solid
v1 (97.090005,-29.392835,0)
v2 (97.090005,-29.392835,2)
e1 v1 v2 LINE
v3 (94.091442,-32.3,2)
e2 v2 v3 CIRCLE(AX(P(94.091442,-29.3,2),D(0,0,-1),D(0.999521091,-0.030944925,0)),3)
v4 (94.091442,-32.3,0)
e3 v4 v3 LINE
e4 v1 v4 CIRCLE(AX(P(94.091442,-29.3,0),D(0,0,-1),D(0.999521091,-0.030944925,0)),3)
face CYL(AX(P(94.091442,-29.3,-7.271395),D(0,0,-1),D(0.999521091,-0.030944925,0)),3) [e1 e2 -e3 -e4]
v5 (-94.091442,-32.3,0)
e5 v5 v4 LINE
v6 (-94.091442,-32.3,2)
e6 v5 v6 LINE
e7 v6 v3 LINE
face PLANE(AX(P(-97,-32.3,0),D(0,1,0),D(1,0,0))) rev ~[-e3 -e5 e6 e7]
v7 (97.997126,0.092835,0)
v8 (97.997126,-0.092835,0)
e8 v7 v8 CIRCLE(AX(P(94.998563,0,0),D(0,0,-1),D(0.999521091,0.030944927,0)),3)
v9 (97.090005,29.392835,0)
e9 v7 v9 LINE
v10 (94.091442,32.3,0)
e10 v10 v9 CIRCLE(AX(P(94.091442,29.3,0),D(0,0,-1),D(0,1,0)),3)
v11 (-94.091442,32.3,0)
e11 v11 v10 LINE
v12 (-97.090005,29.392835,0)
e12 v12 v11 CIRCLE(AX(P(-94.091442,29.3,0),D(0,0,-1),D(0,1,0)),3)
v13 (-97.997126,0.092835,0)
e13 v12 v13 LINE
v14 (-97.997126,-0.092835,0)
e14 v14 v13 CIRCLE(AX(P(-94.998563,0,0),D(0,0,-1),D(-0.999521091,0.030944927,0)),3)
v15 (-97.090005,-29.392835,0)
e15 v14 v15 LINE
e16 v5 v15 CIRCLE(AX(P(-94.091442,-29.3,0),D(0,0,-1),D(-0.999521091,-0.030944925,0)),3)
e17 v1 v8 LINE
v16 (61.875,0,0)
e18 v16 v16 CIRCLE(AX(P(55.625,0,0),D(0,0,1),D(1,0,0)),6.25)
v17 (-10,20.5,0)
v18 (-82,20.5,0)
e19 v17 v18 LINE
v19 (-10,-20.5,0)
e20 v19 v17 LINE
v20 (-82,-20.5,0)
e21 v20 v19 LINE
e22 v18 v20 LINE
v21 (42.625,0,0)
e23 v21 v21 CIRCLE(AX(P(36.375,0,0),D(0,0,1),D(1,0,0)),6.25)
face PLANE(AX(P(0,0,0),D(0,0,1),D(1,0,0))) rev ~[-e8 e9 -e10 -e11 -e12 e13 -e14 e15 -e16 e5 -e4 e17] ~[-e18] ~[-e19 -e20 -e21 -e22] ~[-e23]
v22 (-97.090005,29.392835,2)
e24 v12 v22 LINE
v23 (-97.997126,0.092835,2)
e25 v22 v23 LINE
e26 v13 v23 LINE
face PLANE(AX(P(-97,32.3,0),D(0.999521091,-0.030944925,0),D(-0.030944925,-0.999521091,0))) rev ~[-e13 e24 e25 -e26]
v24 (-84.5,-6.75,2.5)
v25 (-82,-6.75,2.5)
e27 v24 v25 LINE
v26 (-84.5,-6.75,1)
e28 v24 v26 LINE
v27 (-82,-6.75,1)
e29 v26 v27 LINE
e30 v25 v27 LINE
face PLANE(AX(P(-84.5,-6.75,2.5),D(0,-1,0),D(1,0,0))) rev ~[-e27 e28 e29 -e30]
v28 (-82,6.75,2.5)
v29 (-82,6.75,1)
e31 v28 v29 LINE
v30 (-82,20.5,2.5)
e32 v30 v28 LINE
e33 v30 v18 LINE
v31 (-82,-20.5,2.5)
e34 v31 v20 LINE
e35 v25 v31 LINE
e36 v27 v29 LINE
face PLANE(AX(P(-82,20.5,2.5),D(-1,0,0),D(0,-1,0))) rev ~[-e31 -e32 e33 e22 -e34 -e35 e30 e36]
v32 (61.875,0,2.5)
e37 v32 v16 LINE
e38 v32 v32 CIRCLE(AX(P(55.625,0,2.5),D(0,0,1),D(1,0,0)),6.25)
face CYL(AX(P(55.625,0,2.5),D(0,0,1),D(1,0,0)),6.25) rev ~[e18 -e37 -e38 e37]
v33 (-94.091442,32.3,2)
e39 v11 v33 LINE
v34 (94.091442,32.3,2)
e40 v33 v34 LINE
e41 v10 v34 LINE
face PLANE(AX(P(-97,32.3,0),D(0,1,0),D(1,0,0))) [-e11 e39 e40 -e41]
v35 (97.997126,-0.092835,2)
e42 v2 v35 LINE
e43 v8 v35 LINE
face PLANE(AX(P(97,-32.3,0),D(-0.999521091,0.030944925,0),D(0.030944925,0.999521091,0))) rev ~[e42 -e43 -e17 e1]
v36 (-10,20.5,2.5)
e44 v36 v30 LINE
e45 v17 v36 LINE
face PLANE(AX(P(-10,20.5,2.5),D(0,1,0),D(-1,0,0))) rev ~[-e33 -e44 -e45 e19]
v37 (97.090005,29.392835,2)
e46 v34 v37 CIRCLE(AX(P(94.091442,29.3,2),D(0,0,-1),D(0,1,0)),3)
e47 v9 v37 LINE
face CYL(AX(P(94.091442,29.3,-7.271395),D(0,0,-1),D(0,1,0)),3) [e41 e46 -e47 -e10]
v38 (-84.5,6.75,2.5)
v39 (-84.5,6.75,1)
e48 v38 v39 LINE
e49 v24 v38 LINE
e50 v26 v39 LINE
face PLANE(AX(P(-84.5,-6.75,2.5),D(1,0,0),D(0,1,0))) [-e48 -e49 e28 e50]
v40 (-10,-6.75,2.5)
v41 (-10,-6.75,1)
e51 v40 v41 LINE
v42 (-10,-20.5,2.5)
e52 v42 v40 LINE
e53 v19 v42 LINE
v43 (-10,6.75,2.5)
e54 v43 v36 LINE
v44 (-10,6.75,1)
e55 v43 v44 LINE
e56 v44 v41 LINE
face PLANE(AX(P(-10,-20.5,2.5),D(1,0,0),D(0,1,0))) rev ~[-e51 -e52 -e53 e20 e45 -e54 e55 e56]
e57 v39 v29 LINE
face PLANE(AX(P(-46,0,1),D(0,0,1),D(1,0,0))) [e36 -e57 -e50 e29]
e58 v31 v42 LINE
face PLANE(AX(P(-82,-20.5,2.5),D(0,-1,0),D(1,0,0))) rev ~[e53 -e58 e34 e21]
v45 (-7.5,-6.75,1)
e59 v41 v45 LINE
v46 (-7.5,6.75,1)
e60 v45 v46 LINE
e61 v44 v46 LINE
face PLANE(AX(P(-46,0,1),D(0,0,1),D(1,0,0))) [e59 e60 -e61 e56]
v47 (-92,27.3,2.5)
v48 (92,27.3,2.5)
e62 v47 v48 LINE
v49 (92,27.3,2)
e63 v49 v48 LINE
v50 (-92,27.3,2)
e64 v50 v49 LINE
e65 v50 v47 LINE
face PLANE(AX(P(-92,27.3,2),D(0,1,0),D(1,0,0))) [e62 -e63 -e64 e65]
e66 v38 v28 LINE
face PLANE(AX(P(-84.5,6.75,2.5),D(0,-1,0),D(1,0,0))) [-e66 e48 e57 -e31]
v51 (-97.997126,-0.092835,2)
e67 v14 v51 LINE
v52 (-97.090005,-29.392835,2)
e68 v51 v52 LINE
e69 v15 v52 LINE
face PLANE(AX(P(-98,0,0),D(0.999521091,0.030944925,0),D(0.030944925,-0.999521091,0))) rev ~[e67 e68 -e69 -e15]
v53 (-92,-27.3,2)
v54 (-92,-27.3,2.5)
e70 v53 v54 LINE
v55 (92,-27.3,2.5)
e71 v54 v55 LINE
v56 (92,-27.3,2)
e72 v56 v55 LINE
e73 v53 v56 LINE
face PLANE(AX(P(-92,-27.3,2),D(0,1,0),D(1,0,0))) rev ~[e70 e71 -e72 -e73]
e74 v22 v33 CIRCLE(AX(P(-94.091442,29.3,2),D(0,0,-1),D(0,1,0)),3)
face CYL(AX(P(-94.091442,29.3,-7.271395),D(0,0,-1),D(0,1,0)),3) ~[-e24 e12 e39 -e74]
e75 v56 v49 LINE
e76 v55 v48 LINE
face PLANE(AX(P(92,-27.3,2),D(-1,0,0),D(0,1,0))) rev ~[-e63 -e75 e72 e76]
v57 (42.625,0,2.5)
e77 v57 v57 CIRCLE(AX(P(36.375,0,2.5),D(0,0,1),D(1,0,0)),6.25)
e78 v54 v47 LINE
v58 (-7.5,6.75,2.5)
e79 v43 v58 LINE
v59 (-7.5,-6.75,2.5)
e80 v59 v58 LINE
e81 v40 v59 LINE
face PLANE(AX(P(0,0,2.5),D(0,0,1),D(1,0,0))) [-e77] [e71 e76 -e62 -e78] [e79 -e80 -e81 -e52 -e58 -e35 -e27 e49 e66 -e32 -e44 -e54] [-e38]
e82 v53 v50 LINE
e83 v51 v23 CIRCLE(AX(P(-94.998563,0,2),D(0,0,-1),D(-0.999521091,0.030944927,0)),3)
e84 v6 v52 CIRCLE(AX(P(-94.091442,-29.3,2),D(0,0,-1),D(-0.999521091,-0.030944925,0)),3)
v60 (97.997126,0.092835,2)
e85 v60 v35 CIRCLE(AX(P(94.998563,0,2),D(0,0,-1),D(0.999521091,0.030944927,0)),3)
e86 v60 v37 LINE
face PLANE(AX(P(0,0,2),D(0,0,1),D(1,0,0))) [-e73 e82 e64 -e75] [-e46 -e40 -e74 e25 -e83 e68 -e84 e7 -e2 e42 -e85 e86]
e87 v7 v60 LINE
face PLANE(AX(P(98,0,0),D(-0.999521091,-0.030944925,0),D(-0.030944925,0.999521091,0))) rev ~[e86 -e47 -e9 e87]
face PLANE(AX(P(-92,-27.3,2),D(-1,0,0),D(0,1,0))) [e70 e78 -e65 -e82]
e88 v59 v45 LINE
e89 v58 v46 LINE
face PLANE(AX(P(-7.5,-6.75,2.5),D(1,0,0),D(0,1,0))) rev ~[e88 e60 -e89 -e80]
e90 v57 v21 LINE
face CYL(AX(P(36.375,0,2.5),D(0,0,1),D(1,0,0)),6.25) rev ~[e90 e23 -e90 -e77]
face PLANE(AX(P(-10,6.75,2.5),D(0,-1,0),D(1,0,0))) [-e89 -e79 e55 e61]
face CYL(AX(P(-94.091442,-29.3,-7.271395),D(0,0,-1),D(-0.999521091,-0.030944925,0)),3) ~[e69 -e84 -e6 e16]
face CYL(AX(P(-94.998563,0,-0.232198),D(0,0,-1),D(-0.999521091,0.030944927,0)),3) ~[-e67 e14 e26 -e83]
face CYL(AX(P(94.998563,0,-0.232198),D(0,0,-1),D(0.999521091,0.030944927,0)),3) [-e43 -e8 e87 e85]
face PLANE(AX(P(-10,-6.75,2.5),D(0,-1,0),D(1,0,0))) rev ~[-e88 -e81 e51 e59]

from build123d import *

# Parameters (mm, degrees)
F0_W        = 194
F0_H        = 64.6
F1_DEPTH    = 2
F2_W        = 184
F2_H        = 54.6
F3_DEPTH    = 0.5
F4_R        = 6.25
F4_W        = 2.5
F4_H        = 13.5
F5_DEPTH    = 25
F6_T1_DEPTH = 16.5427907903
F6_T3_DEPTH = 2.4643962848
F7_DEPTH    = 1.5


# Not quite as in the source:
# - a fillet or chamfer that OpenCascade refuses, or shapes differently, is made with other operations: its cross-section is extruded or revolved along the edge and cut away or added


with BuildPart() as f1:
    # F0 (on Top) → F1 (new body)
    with BuildSketch(Plane.XY):
        Rectangle(F0_W, F0_H)
        Polygon((98, 0), (97, 32.3), (97, -32.3), align=None)
        Polygon((-97, -32.3), (-97, 32.3), (-98, 0), align=None)
    extrude(amount=F1_DEPTH)

    # F2 (on face) → F3 (join)
    with BuildSketch(Plane.XY.offset(2)):
        Rectangle(F2_W, F2_H)
    extrude(amount=F3_DEPTH)

    # F4 (on face) → F5 (cut)
    with BuildSketch(Plane.XY.offset(2.5)):
        Polygon((-10, 20.5), (-82, 20.5), (-82, 6.75), (-79.5, 6.75), (-79.5, -6.75), (-82, -6.75), (-82, -20.5), (-10, -20.5), (-10, -6.75), (-12.5, -6.75), (-12.5, 6.75), (-10, 6.75), align=None)
        with Locations((36.375, 0)):
            Circle(F4_R)
        with Locations((55.625, 0)):
            Circle(F4_R)
        with Locations((-11.25, 0)):
            Rectangle(F4_W, F4_H)
        with Locations((-80.75, 0)):
            Rectangle(F4_W, F4_H)
    extrude(amount=-F5_DEPTH, mode=Mode.SUBTRACT)

    # F6: fillet of radius 3 on 6 edges, made by hand

    # F6_s2 → F6_t1 (cut)
    with BuildSketch(Plane.XY.offset(-7.2713953952)):
        with BuildLine():
            ThreePointArc((97.0900051153, -29.3928347763), (96.1796822102, -31.4538923289), (94.0914418419, -32.3))
            Line((94.0914418419, -32.3), (97, -32.3))
            Line((97, -32.3), (97.0900051153, -29.3928347763))
        make_face()
        with BuildLine():
            ThreePointArc((94.0914418419, 32.3), (96.1796822102, 31.4538923289), (97.0900051153, 29.3928347763))
            Line((97.0900051153, 29.3928347763), (97, 32.3))
            Line((97, 32.3), (94.0914418419, 32.3))
        make_face()
        with BuildLine():
            ThreePointArc((-94.0914418419, 32.3), (-96.1796822102, 31.4538923289), (-97.0900051153, 29.3928347763))
            Line((-97.0900051153, 29.3928347763), (-97, 32.3))
            Line((-97, 32.3), (-94.0914418419, 32.3))
        make_face()
        with BuildLine():
            ThreePointArc((-97.0900051153, -29.3928347763), (-96.1796822102, -31.4538923289), (-94.0914418419, -32.3))
            Line((-94.0914418419, -32.3), (-97, -32.3))
            Line((-97, -32.3), (-97.0900051153, -29.3928347763))
        make_face()
    extrude(amount=F6_T1_DEPTH, mode=Mode.SUBTRACT)

    # F6_s4 → F6_t3 (cut)
    with BuildSketch(Plane.XY.offset(-0.2321981424)):
        with BuildLine():
            ThreePointArc((-97.9971258583, 0.0928347763), (-97.998562585, 0), (-97.9971258583, -0.0928347763))
            Line((-97.9971258583, -0.0928347763), (-98, 0))
            Line((-98, 0), (-97.9971258583, 0.0928347763))
        make_face()
        with BuildLine():
            ThreePointArc((97.9971258583, 0.0928347763), (97.998562585, 0), (97.9971258583, -0.0928347763))
            Line((97.9971258583, -0.0928347763), (98, 0))
            Line((98, 0), (97.9971258583, 0.0928347763))
        make_face()
    extrude(amount=F6_T3_DEPTH, mode=Mode.SUBTRACT)

    # F4 (on face) → F7 (cut)
    with BuildSketch(Plane.XY.offset(2.5)):
        Polygon((-10, 20.5), (-82, 20.5), (-82, 6.75), (-79.5, 6.75), (-79.5, -6.75), (-82, -6.75), (-82, -20.5), (-10, -20.5), (-10, -6.75), (-12.5, -6.75), (-12.5, 6.75), (-10, 6.75), align=None)
        with Locations((-80.75, 0)):
            Rectangle(F4_W, F4_H)
        with Locations((-83.25, 0)):
            Rectangle(F4_W, F4_H)
        with Locations((-8.75, 0)):
            Rectangle(F4_W, F4_H)
        with Locations((-11.25, 0)):
            Rectangle(F4_W, F4_H)
        with Locations((36.375, 0)):
            Circle(F4_R)
        with Locations((55.625, 0)):
            Circle(F4_R)
    extrude(amount=-F7_DEPTH, mode=Mode.SUBTRACT)


solid = f1.part
